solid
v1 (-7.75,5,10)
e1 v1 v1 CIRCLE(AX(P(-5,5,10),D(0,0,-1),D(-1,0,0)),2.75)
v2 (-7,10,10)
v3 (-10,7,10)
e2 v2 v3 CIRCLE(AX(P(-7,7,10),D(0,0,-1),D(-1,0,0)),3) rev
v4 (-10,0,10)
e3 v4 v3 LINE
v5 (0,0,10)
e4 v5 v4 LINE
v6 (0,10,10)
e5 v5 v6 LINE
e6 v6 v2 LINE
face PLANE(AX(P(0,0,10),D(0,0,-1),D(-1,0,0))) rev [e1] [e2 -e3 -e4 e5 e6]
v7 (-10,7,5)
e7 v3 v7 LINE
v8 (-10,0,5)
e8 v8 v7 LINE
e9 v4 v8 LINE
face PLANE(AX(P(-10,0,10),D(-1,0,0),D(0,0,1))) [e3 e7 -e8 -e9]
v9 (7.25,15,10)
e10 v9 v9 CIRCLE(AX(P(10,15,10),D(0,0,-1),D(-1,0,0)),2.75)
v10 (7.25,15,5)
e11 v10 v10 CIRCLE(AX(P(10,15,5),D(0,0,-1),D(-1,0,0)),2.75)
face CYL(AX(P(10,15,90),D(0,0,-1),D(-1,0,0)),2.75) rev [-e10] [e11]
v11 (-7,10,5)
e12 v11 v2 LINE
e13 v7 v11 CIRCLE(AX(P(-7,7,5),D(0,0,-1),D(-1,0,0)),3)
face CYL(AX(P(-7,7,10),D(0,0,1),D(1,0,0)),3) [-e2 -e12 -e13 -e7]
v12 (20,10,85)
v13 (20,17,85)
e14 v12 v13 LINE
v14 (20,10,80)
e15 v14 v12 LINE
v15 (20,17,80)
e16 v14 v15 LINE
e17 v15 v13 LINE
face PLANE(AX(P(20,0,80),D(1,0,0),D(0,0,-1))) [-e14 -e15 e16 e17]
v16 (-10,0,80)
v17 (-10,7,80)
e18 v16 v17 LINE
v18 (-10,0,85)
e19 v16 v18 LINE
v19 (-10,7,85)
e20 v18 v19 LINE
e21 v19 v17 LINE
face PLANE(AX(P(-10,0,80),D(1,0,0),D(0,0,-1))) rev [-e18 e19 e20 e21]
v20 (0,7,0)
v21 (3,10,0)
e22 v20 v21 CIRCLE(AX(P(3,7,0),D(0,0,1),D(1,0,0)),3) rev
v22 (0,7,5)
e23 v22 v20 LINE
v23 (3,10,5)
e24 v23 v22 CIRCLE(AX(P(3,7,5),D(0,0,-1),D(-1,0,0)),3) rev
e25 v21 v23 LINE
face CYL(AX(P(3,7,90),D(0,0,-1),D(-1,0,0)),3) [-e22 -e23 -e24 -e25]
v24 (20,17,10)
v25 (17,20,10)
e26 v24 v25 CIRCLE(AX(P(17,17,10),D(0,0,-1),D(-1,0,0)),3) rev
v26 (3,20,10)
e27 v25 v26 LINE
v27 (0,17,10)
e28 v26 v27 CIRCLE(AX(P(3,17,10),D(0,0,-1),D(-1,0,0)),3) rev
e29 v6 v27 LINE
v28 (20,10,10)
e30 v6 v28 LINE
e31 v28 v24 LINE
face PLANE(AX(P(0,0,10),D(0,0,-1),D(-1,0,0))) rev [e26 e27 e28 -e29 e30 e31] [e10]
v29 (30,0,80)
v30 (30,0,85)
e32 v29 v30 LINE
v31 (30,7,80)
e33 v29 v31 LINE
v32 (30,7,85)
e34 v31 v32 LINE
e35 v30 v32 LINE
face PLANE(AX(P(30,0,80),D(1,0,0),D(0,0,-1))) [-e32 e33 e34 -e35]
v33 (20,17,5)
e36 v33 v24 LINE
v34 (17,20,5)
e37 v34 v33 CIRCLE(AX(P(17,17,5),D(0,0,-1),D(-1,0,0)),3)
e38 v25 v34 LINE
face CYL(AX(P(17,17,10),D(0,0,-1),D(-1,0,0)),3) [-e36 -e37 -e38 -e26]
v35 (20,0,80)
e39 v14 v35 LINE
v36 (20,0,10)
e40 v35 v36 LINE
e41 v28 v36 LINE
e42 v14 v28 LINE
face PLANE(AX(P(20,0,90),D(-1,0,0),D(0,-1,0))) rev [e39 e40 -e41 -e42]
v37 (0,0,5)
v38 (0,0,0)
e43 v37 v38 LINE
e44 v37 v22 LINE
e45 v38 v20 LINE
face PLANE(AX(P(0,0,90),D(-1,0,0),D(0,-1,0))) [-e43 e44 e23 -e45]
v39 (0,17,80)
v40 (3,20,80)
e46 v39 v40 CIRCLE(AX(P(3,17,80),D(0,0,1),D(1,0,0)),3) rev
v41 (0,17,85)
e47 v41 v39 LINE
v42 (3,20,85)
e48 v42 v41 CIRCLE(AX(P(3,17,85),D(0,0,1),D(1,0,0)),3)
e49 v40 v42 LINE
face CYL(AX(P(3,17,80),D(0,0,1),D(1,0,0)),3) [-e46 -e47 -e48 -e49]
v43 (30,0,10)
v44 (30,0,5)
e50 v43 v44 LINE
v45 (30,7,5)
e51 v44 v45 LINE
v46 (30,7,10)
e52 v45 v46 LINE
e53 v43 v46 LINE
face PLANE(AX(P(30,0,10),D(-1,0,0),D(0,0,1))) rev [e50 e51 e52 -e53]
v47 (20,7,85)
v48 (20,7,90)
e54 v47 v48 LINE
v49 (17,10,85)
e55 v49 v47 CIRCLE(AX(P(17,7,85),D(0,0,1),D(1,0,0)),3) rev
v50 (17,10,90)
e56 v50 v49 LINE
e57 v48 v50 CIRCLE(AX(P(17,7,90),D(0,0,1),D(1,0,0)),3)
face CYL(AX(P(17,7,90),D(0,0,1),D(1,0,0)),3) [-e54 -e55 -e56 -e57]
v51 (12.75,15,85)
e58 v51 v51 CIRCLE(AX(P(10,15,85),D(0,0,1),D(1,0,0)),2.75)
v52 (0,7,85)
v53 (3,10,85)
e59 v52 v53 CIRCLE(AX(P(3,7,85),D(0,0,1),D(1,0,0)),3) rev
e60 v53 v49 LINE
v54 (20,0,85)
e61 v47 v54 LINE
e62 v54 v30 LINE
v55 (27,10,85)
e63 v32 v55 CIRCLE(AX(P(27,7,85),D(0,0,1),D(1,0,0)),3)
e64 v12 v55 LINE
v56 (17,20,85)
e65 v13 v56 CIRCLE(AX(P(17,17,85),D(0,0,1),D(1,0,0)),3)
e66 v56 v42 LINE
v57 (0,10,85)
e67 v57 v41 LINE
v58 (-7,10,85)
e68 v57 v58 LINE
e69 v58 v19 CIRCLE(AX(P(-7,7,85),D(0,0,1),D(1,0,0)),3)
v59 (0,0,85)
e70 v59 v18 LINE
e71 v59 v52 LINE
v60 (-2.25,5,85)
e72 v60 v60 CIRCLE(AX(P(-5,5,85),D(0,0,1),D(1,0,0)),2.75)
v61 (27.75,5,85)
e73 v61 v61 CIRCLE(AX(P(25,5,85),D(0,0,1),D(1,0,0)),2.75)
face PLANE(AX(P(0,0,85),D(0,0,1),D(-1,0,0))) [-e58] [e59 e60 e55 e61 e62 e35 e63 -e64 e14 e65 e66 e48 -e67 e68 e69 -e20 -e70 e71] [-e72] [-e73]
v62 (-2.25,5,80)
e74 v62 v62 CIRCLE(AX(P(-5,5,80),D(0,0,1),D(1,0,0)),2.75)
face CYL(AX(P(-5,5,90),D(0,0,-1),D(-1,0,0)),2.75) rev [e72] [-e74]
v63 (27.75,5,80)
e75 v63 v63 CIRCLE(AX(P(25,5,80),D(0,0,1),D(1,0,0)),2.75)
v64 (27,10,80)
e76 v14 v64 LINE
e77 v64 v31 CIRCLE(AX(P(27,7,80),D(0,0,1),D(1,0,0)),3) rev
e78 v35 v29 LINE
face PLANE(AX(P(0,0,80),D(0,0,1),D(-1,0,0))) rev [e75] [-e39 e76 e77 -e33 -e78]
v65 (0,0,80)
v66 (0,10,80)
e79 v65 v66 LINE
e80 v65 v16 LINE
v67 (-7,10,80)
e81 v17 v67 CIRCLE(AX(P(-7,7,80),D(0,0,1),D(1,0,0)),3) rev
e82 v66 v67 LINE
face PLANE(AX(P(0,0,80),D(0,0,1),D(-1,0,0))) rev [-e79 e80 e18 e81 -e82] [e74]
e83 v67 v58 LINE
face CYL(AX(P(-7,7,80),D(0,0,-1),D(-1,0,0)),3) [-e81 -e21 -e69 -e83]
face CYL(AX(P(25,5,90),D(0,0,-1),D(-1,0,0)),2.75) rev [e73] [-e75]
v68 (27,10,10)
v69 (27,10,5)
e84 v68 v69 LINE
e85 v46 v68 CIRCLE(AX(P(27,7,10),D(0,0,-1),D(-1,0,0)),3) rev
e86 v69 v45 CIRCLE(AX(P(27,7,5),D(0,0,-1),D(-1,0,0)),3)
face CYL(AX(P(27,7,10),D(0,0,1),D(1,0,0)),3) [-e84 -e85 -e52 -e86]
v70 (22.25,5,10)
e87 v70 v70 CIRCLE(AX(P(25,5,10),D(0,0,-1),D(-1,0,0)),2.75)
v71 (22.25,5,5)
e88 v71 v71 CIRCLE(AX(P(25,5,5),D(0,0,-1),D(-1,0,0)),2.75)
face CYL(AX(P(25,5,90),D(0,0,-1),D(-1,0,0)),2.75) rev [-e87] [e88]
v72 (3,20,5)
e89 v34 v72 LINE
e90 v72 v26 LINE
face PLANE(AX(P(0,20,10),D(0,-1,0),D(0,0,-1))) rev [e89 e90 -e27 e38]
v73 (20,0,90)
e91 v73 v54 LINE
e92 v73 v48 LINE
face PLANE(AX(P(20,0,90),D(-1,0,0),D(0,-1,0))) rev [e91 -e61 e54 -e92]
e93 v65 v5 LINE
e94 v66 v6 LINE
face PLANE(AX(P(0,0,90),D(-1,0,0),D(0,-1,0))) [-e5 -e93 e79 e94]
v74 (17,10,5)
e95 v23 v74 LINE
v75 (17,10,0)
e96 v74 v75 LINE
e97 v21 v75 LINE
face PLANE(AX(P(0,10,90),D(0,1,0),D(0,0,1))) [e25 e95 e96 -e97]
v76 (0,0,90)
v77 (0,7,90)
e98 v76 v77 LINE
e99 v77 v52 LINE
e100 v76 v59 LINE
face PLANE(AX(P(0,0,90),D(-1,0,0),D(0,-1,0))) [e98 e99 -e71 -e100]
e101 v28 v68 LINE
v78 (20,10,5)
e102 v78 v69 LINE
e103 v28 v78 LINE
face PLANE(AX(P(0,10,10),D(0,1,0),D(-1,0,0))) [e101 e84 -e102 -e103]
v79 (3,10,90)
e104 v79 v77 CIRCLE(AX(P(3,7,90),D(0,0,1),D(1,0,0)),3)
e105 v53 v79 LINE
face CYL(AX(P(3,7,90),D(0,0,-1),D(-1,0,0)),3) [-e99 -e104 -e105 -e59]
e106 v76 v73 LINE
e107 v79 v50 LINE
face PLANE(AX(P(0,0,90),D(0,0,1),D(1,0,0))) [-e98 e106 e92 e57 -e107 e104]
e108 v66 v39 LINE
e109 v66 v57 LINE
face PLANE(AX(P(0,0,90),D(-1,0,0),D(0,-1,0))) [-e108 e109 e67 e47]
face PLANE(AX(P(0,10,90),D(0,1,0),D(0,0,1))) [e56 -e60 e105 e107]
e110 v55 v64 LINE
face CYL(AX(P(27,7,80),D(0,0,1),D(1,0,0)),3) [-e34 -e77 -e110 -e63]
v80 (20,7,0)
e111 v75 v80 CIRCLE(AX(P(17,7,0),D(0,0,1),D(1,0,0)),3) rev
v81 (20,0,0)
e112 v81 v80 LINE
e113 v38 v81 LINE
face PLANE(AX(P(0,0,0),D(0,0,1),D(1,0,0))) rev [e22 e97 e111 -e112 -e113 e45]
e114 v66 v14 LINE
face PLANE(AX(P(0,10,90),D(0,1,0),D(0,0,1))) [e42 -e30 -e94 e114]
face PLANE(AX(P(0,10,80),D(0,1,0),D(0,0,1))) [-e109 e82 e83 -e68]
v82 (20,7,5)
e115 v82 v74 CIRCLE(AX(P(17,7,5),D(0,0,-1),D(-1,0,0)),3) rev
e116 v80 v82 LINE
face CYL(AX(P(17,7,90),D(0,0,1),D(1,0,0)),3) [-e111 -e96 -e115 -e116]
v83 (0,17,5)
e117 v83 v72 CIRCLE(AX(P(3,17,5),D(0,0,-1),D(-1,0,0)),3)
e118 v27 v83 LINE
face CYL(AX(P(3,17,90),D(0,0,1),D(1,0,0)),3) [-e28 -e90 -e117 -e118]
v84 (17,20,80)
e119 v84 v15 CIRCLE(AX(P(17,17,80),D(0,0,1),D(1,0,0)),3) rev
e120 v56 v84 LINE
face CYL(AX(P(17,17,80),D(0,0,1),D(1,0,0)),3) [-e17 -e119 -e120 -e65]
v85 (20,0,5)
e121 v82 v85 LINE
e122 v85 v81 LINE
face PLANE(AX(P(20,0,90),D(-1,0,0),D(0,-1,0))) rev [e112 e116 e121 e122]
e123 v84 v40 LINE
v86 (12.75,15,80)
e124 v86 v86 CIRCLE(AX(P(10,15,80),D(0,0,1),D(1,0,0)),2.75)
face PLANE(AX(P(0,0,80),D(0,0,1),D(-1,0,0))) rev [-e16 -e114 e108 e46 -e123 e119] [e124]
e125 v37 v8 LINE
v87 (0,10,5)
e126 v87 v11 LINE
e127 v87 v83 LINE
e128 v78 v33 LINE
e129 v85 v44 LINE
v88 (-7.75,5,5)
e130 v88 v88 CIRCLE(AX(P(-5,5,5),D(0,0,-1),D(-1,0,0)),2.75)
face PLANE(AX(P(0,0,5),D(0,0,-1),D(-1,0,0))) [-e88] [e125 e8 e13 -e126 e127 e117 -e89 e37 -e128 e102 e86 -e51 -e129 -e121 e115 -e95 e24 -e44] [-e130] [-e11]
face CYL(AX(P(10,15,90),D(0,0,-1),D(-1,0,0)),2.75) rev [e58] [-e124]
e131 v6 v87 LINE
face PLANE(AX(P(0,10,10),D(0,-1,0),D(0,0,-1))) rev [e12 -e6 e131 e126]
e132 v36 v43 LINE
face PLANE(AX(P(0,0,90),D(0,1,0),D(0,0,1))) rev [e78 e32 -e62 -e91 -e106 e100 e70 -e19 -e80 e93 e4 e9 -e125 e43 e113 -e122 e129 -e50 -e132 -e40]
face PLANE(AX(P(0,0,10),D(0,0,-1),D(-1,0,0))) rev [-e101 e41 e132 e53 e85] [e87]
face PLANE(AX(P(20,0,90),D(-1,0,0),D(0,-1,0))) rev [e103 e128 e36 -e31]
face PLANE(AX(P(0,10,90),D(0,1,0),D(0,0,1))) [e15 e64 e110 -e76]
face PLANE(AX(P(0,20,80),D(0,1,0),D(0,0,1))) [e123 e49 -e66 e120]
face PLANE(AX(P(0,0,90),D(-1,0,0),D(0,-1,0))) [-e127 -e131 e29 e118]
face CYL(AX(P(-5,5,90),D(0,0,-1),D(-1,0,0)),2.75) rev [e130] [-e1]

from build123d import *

# Parameters (mm, degrees)
SKETCH_1_W               = 20
SKETCH_1_H               = 10
EXTRUDE_1_DEPTH          = 90
EXTRUDE_START            = -5
SKETCH_2_W               = 10
SKETCH_2_H               = 10
SKETCH_2_W_2             = 20
EXTRUDE_2_DEPTH          = 5
CUT_EXTRUDE_1_DEPTH      = 93.330926563
CUT_EXTRUDE_1_DEPTH_BACK = 93.330926563
SKETCH_3_R               = 2.75
FILLET_1_R               = 3


with BuildPart() as part:
    # 草图1 → 凸台-拉伸1 (new body)
    with BuildSketch(Plane.XY):
        with Locations((10, 5)):
            Rectangle(SKETCH_1_W, SKETCH_1_H)
    extrude(amount=EXTRUDE_1_DEPTH)

    # 草图2 → 凸台-拉伸2 (add)
    with BuildSketch(Plane(origin=(0, 0, 0), x_dir=(-1, 0, 0), z_dir=(0, 0, -1)).offset(EXTRUDE_START)):
        with Locations((-25, 5)):
            Rectangle(SKETCH_2_W, SKETCH_2_H)
        with Locations((-10, 15)):
            Rectangle(SKETCH_2_W_2, SKETCH_2_H)
        with Locations((5, 5)):
            Rectangle(SKETCH_2_W, SKETCH_2_H)
    extrude_2 = extrude(amount=-EXTRUDE_2_DEPTH)

    # 镜向1: 凸台-拉伸2 across plane
    add(extrude_2.mirror(Plane(origin=(0, 0, 45), x_dir=(1, 0, 0), z_dir=(0, 0, -1))))

    # 草图3 → 切除-拉伸1 (cut, two sides: drawn at the far end of the back side and taken through both)
    with BuildSketch(Plane(origin=(0, 0, 5), x_dir=(-1, 0, 0), z_dir=(0, 0, -1)).offset(-CUT_EXTRUDE_1_DEPTH_BACK)):
        with Locations(Location((5, 5, 0), (0, 0, 180))):
            Circle(SKETCH_3_R)
        with Locations(Location((-10, 15, 0), (0, 0, 180))):
            Circle(SKETCH_3_R)
        with Locations(Location((-25, 5, 0), (0, 0, 180))):
            Circle(SKETCH_3_R)
    extrude(amount=CUT_EXTRUDE_1_DEPTH + CUT_EXTRUDE_1_DEPTH_BACK, mode=Mode.SUBTRACT)

    # 圆角1
    # the kernel refuses this fillet: 3 mm, written as the material it takes off along each edge
    with BuildSketch(Plane(origin=(0, 10, -7.5), x_dir=(0, -1, 0), z_dir=(0, 0, 1)), Plane(origin=(0, 10, 85), x_dir=(0, -1, 0), z_dir=(0, 0, 1))) as fillet_1_piece_1:
        with BuildLine():
            CenterArc((FILLET_1_R, FILLET_1_R), FILLET_1_R, 180, 90)
            Line((0, FILLET_1_R), (0, 0))
            Line((0, 0), (FILLET_1_R, 0))
        make_face()
    extrude(amount=12.5, mode=Mode.SUBTRACT)
    with BuildSketch(Plane(origin=(20, 10, -7.5), x_dir=(0, -1, 0), z_dir=(0, 0, 1)), Plane(origin=(20, 10, 85), x_dir=(0, -1, 0), z_dir=(0, 0, 1))) as fillet_1_piece_2:
        with BuildLine():
            CenterArc((FILLET_1_R, -FILLET_1_R), FILLET_1_R, 90, 90)
            Line((0, -FILLET_1_R), (0, 0))
            Line((0, 0), (FILLET_1_R, 0))
        make_face()
    extrude(amount=12.5, mode=Mode.SUBTRACT)
    with BuildSketch(Plane(origin=(20, 20, -2.5), x_dir=(0, -1, 0), z_dir=(0, 0, 1)), Plane(origin=(30, 10, -2.5), x_dir=(0, -1, 0), z_dir=(0, 0, 1)), Plane(origin=(0, 20, 92.5), x_dir=(0, -1, 0), z_dir=(0, 0, -1)), Plane(origin=(-10, 10, 92.5), x_dir=(0, -1, 0), z_dir=(0, 0, -1))) as fillet_1_piece_3:
        with BuildLine():
            CenterArc((FILLET_1_R, -FILLET_1_R), FILLET_1_R, 90, 90)
            Line((0, -FILLET_1_R), (0, 0))
            Line((0, 0), (FILLET_1_R, 0))
        make_face()
    extrude(amount=20, mode=Mode.SUBTRACT)
    with BuildSketch(Plane(origin=(0, 20, -2.5), x_dir=(0, -1, 0), z_dir=(0, 0, 1)), Plane(origin=(-10, 10, -2.5), x_dir=(0, -1, 0), z_dir=(0, 0, 1)), Plane(origin=(30, 10, 92.5), x_dir=(0, -1, 0), z_dir=(0, 0, -1)), Plane(origin=(20, 20, 92.5), x_dir=(0, -1, 0), z_dir=(0, 0, -1))) as fillet_1_piece_4:
        with BuildLine():
            CenterArc((FILLET_1_R, FILLET_1_R), FILLET_1_R, 180, 90)
            Line((0, FILLET_1_R), (0, 0))
            Line((0, 0), (FILLET_1_R, 0))
        make_face()
    extrude(amount=20, mode=Mode.SUBTRACT)


solid = part.part
